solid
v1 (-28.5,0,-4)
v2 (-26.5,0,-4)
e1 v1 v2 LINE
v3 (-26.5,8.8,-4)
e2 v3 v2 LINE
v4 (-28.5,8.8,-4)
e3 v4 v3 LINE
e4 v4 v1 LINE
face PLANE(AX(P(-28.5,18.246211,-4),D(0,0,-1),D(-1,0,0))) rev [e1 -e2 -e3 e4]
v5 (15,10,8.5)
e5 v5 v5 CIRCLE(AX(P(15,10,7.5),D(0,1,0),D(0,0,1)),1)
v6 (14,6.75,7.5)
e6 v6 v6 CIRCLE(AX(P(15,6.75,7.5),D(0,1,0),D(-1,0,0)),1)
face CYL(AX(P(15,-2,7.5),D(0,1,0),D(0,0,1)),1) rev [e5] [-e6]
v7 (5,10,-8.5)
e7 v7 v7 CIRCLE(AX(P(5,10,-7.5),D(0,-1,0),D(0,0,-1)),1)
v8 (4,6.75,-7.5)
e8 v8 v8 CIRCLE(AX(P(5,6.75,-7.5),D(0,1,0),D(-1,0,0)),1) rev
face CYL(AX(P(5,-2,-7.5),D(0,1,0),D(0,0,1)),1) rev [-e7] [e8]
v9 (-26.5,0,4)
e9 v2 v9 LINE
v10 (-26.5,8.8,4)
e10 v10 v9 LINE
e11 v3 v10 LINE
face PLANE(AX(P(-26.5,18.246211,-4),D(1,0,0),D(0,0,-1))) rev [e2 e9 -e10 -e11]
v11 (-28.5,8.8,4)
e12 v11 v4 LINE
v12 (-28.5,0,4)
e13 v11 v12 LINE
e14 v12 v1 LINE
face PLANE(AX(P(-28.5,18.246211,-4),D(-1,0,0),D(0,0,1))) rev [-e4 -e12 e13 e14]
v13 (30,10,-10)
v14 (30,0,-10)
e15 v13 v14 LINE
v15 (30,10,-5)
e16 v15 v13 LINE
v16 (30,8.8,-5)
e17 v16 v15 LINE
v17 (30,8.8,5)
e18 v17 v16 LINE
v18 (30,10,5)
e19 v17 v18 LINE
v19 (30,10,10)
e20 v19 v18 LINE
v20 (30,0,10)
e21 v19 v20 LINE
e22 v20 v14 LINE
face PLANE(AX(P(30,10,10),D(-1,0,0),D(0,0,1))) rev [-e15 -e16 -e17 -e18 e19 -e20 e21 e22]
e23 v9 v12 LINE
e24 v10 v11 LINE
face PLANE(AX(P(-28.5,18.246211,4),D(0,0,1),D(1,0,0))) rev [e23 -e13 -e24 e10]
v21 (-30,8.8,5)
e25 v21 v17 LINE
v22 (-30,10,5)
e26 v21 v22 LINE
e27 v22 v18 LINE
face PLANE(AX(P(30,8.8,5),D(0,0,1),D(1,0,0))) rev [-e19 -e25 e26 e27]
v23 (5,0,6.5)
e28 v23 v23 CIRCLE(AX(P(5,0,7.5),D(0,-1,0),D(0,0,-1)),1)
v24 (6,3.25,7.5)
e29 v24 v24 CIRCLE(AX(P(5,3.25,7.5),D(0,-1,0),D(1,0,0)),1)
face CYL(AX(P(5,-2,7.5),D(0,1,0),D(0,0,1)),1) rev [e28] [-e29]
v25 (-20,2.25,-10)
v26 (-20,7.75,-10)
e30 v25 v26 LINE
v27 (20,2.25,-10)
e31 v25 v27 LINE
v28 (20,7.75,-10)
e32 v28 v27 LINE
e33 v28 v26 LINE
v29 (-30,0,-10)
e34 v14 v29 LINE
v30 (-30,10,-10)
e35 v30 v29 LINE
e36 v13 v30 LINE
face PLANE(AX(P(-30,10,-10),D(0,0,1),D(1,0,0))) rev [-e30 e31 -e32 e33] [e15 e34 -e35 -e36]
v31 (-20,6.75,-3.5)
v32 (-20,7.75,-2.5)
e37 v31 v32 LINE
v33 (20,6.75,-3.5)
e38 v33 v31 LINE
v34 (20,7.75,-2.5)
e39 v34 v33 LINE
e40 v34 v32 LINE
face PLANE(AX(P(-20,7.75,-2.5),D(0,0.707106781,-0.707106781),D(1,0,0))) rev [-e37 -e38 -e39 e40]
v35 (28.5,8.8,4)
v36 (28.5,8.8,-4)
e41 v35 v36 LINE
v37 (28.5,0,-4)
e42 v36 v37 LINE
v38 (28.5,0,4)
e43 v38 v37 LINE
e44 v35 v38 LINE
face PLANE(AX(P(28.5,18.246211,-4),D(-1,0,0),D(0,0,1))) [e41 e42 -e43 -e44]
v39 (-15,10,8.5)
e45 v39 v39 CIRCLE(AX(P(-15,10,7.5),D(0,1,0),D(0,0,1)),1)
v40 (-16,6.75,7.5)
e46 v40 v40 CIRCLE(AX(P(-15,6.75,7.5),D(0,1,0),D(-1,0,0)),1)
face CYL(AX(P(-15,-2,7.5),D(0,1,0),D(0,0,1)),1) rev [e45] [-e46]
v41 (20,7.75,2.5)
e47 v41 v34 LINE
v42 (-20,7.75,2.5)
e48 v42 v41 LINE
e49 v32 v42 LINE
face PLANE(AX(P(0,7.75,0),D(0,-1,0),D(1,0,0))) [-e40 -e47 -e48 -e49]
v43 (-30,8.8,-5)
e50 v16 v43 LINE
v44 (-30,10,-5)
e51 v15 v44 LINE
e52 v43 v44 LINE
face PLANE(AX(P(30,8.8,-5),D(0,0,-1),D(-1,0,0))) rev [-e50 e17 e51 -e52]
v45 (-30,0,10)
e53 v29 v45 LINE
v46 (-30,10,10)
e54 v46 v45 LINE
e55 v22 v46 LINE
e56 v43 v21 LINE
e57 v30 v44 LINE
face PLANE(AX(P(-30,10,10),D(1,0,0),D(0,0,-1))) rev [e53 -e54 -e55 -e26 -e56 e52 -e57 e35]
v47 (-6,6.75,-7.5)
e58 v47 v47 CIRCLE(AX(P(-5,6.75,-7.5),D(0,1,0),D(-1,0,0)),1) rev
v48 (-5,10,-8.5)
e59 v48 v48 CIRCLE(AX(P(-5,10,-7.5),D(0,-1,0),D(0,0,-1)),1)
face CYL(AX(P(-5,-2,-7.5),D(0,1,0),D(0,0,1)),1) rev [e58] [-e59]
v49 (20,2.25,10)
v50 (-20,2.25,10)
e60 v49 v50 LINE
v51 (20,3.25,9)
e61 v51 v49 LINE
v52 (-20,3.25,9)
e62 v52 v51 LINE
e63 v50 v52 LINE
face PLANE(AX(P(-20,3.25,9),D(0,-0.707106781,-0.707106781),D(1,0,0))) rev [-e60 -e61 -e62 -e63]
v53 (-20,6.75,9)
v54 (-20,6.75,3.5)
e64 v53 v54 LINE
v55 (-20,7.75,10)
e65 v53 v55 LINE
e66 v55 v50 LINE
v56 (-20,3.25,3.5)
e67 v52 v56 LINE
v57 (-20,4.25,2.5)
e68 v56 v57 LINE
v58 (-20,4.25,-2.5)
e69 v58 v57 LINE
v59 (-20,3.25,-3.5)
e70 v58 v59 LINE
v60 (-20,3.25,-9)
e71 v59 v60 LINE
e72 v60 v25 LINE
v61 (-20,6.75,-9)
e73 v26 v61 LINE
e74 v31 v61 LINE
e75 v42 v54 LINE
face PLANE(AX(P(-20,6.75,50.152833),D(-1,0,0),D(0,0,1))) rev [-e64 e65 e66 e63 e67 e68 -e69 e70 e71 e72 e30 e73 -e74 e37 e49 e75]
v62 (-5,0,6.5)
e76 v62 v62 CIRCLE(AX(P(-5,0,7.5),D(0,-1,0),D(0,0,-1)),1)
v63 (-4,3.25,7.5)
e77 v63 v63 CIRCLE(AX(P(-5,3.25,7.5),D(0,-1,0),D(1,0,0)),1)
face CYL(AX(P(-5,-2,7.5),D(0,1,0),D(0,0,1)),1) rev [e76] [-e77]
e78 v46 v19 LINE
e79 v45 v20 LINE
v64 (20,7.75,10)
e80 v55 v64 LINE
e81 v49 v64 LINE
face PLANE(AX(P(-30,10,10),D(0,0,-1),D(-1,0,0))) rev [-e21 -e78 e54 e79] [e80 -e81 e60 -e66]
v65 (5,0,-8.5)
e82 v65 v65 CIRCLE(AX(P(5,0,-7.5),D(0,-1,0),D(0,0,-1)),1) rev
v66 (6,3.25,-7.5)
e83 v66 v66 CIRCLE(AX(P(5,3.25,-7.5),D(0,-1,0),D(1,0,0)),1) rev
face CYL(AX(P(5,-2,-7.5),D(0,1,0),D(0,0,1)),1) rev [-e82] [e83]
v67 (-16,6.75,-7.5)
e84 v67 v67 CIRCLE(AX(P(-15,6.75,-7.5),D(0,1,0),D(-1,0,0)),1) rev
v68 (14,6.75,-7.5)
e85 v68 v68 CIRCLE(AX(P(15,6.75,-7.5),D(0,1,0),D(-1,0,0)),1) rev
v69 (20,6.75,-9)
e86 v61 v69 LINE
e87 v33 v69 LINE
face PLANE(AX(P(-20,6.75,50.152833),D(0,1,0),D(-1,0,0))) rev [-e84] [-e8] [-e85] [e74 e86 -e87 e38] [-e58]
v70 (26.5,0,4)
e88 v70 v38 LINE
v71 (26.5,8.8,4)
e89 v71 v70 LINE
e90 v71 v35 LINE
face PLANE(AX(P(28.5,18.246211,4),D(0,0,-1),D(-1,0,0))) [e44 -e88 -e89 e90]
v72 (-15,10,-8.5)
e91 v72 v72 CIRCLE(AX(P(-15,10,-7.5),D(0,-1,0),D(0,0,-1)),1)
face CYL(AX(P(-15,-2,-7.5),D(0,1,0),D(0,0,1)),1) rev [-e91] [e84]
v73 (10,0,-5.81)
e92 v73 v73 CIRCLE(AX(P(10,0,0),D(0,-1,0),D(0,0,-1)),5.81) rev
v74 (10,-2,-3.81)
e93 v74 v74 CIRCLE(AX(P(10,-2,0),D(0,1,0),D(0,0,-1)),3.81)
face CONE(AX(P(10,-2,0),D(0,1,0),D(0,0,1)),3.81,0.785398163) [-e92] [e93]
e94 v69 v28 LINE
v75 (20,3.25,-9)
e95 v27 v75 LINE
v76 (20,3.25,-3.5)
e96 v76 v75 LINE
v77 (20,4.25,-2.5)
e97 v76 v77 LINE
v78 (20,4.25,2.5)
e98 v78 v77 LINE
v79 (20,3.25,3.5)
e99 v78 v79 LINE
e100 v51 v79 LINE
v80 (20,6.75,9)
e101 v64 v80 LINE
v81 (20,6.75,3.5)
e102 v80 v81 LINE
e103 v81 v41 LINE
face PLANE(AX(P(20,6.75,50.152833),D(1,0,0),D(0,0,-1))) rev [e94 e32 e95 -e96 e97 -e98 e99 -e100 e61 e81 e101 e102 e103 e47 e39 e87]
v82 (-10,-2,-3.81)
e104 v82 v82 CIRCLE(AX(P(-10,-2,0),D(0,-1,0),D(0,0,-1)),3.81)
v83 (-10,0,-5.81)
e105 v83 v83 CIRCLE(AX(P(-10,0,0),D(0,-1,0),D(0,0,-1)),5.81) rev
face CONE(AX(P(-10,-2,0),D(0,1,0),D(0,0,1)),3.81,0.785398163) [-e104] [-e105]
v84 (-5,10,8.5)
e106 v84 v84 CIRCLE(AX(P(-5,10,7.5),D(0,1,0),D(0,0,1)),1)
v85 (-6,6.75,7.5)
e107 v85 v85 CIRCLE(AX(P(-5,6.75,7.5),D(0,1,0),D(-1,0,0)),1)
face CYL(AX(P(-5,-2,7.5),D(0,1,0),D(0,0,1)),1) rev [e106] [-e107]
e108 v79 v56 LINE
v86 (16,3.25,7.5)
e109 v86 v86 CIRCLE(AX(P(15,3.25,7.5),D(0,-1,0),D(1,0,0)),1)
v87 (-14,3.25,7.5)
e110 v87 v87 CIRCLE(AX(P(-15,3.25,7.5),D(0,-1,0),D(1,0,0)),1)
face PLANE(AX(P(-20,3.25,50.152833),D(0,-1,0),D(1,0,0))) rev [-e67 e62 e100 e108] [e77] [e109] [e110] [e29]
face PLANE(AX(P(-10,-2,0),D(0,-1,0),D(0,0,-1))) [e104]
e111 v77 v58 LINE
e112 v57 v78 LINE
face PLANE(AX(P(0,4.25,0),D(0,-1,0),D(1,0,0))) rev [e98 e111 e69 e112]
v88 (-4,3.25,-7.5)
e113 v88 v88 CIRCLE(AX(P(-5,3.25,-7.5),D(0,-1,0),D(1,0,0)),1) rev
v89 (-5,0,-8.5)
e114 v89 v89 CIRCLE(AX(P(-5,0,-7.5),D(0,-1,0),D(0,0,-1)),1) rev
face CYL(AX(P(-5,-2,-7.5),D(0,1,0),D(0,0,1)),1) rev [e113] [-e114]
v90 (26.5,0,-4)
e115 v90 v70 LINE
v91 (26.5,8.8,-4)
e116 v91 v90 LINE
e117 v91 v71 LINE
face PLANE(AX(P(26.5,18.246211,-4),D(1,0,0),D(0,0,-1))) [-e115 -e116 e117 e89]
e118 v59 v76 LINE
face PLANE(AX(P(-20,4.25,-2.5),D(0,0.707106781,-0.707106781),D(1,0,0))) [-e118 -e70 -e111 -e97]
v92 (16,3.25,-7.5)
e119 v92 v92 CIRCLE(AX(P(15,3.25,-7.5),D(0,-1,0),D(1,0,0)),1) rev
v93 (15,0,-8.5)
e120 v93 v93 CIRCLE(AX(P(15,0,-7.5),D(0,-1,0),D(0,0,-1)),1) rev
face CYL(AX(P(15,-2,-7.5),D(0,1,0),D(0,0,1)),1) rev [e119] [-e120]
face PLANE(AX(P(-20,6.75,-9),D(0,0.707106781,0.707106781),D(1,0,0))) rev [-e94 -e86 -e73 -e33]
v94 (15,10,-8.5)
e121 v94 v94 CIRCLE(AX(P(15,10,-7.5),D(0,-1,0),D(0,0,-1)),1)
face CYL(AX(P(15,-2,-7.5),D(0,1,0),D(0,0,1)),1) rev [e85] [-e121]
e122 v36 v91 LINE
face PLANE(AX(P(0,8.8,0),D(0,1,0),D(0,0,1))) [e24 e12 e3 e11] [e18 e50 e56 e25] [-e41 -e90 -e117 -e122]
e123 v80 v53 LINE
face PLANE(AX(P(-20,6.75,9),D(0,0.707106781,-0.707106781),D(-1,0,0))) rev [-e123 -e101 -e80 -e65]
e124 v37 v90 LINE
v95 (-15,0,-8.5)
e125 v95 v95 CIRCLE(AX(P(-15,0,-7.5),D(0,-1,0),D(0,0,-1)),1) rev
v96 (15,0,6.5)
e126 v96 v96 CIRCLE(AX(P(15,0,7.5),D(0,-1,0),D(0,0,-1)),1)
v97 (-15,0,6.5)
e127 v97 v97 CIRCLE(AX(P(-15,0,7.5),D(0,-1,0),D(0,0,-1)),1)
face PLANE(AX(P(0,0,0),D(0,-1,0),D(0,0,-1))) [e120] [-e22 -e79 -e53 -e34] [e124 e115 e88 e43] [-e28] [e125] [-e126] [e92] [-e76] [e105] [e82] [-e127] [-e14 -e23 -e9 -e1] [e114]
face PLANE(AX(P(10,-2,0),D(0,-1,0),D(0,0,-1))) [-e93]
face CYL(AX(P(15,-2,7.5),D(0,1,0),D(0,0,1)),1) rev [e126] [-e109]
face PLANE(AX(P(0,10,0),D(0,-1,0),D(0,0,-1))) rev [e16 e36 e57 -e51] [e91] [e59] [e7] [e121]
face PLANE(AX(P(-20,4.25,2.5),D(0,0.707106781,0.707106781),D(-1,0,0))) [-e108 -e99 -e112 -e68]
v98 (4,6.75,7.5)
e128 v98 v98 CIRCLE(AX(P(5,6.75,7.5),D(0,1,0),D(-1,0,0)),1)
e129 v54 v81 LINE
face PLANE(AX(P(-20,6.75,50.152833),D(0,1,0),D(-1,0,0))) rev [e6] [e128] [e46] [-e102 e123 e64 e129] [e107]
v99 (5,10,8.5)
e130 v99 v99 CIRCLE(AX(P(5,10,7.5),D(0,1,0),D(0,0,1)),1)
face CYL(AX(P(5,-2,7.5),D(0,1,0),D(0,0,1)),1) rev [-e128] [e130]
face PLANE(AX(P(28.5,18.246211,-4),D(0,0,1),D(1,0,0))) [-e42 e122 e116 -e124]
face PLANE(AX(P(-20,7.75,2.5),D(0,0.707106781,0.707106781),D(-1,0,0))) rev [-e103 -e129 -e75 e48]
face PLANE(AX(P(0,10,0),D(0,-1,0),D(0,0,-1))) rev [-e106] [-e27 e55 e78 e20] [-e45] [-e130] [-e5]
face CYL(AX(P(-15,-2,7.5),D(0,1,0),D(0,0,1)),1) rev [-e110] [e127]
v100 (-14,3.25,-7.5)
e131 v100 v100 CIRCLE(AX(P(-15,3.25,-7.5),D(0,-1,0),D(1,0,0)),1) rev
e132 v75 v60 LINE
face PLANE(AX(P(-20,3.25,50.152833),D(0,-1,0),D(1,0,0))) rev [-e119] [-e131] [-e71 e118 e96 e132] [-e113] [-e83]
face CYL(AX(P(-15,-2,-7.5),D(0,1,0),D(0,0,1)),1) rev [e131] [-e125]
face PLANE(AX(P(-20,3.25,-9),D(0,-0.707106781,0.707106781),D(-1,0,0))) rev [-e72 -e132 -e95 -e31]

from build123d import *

# Parameters (mm, degrees)
SKETCH1_W                = 60
SKETCH1_H                = 20
BASE_DEPTH               = 10
SKETCH2_R                = 3.81
FSR_MOUNT_DEPTH          = 2
CHAMFER1_SIZE            = 2
CHAMFER1_OF_MIRROR1_SIZE = 2
SKETCH5_W                = 40
SKETCH5_H                = 3.5
CUT_EXTRUDE3_DEPTH       = 20
SKETCH6_W                = 40
SKETCH6_H                = 5
BOSS_EXTRUDE4_DEPTH      = 1
SKETCH8_W                = 40
SKETCH8_H                = 5
CUT_EXTRUDE6_DEPTH       = 1
CHAMFER2_SIZE            = 1
SKETCH9_W                = 2
SKETCH9_H                = 8
CUT_EXTRUDE7_DEPTH       = 10
SKETCH10_W               = 60
SKETCH10_H               = 10
CUT_EXTRUDE8_DEPTH       = 1.2
SKETCH11_R               = 1
CUT_EXTRUDE9_DEPTH       = 34.823069051


with BuildPart() as part:
    # Sketch1 → Base (new body)
    with BuildSketch(Plane(origin=(0, 0, 0), x_dir=(1, 0, 0), z_dir=(0, 1, 0))):
        Rectangle(SKETCH1_W, SKETCH1_H)
    extrude(amount=BASE_DEPTH)

    # Sketch2 → FSR Mount (add)
    with BuildSketch(Plane.XZ):
        with Locations(Location((-10, 0, 0), (0, 0, 270))):
            Circle(SKETCH2_R)
    fsr_mount = extrude(amount=FSR_MOUNT_DEPTH)

    # Chamfer1
    chamfer1_edges = [part.edges().sort_by_distance(p)[0] for p in [
        (-10, 0, 3.81),
    ]]
    chamfer(chamfer1_edges, length=CHAMFER1_SIZE - 0.0001)  # a hair under: the kernel refuses the full size

    # Mirror1: FSR Mount across plane
    add(fsr_mount.mirror(Plane(origin=(0, 0, 0), x_dir=(0, 0, 1), z_dir=(1, 0, 0))))

    # Chamfer1 of Mirror1
    chamfer1_of_mirror1_edges = [part.edges().sort_by_distance(p)[0] for p in [
        (10, 0, 3.81),
    ]]
    chamfer(chamfer1_of_mirror1_edges, length=CHAMFER1_OF_MIRROR1_SIZE - 0.0001)  # a hair under: the kernel refuses the full size

    # Sketch5 → Cut-Extrude3 (cut)
    with BuildSketch(Plane(origin=(0, 0, -10), x_dir=(-1, 0, 0), z_dir=(0, 0, -1))):
        with Locations((0, 5)):
            Rectangle(SKETCH5_W, SKETCH5_H)
    extrude(amount=-CUT_EXTRUDE3_DEPTH, mode=Mode.SUBTRACT)

    # Sketch6 → Boss-Extrude4 (add)
    with BuildSketch(Plane(origin=(0, 3.25, 0), x_dir=(1, 0, 0), z_dir=(0, 1, 0))):
        Rectangle(SKETCH6_W, SKETCH6_H)
    extrude(amount=BOSS_EXTRUDE4_DEPTH)

    # Sketch8 → Cut-Extrude6 (cut)
    with BuildSketch(Plane.XZ.offset(-6.75)):
        Rectangle(SKETCH8_W, SKETCH8_H)
    extrude(amount=-CUT_EXTRUDE6_DEPTH, mode=Mode.SUBTRACT)

    # Chamfer2
    chamfer2_edges = [part.edges().sort_by_distance(p)[0] for p in [
        (0, 6.75, -2.5),
        (0, 6.75, 10),
        (0, 3.25, -2.5),
        (0, 3.25, 2.5),
        (0, 3.25, -10),
        (0, 6.75, -10),
        (0, 3.25, 10),
        (0, 6.75, 2.5),
    ]]
    chamfer(chamfer2_edges, length=CHAMFER2_SIZE - 0.0001)  # a hair under: the kernel refuses the full size

    # Sketch9 → Cut-Extrude7 (cut)
    with BuildSketch(Plane.XZ):
        with Locations((-27.5, 0)):
            Rectangle(SKETCH9_W, SKETCH9_H)
    cut_extrude7 = extrude(amount=-CUT_EXTRUDE7_DEPTH, mode=Mode.SUBTRACT)

    # Mirror2: Cut-Extrude7 across plane
    add(cut_extrude7.mirror(Plane(origin=(0, 0, 0), x_dir=(0, 0, 1), z_dir=(1, 0, 0))), mode=Mode.SUBTRACT)

    # Sketch10 → Cut-Extrude8 (cut)
    with BuildSketch(Plane(origin=(0, 10, 0), x_dir=(1, 0, 0), z_dir=(0, 1, 0))):
        Rectangle(SKETCH10_W, SKETCH10_H)
    extrude(amount=-CUT_EXTRUDE8_DEPTH, mode=Mode.SUBTRACT)

    # Sketch11 → Cut-Extrude9 (cut, through all)
    with BuildSketch(Plane(origin=(0, 10, 0), x_dir=(1, 0, 0), z_dir=(0, 1, 0))):
        with Locations(Location((-15, -7.5, 0), (0, 0, 270))):
            Circle(SKETCH11_R)
        with Locations(Location((-5, -7.5, 0), (0, 0, 270))):
            Circle(SKETCH11_R)
        with Locations(Location((5, -7.5, 0), (0, 0, 270))):
            Circle(SKETCH11_R)
        with Locations(Location((15, -7.5, 0), (0, 0, 270))):
            Circle(SKETCH11_R)
    cut_extrude9 = extrude(amount=-CUT_EXTRUDE9_DEPTH, mode=Mode.SUBTRACT)

    # Mirror5: Cut-Extrude9 across plane
    add(cut_extrude9.mirror(Plane.XY), mode=Mode.SUBTRACT)


solid = part.part
